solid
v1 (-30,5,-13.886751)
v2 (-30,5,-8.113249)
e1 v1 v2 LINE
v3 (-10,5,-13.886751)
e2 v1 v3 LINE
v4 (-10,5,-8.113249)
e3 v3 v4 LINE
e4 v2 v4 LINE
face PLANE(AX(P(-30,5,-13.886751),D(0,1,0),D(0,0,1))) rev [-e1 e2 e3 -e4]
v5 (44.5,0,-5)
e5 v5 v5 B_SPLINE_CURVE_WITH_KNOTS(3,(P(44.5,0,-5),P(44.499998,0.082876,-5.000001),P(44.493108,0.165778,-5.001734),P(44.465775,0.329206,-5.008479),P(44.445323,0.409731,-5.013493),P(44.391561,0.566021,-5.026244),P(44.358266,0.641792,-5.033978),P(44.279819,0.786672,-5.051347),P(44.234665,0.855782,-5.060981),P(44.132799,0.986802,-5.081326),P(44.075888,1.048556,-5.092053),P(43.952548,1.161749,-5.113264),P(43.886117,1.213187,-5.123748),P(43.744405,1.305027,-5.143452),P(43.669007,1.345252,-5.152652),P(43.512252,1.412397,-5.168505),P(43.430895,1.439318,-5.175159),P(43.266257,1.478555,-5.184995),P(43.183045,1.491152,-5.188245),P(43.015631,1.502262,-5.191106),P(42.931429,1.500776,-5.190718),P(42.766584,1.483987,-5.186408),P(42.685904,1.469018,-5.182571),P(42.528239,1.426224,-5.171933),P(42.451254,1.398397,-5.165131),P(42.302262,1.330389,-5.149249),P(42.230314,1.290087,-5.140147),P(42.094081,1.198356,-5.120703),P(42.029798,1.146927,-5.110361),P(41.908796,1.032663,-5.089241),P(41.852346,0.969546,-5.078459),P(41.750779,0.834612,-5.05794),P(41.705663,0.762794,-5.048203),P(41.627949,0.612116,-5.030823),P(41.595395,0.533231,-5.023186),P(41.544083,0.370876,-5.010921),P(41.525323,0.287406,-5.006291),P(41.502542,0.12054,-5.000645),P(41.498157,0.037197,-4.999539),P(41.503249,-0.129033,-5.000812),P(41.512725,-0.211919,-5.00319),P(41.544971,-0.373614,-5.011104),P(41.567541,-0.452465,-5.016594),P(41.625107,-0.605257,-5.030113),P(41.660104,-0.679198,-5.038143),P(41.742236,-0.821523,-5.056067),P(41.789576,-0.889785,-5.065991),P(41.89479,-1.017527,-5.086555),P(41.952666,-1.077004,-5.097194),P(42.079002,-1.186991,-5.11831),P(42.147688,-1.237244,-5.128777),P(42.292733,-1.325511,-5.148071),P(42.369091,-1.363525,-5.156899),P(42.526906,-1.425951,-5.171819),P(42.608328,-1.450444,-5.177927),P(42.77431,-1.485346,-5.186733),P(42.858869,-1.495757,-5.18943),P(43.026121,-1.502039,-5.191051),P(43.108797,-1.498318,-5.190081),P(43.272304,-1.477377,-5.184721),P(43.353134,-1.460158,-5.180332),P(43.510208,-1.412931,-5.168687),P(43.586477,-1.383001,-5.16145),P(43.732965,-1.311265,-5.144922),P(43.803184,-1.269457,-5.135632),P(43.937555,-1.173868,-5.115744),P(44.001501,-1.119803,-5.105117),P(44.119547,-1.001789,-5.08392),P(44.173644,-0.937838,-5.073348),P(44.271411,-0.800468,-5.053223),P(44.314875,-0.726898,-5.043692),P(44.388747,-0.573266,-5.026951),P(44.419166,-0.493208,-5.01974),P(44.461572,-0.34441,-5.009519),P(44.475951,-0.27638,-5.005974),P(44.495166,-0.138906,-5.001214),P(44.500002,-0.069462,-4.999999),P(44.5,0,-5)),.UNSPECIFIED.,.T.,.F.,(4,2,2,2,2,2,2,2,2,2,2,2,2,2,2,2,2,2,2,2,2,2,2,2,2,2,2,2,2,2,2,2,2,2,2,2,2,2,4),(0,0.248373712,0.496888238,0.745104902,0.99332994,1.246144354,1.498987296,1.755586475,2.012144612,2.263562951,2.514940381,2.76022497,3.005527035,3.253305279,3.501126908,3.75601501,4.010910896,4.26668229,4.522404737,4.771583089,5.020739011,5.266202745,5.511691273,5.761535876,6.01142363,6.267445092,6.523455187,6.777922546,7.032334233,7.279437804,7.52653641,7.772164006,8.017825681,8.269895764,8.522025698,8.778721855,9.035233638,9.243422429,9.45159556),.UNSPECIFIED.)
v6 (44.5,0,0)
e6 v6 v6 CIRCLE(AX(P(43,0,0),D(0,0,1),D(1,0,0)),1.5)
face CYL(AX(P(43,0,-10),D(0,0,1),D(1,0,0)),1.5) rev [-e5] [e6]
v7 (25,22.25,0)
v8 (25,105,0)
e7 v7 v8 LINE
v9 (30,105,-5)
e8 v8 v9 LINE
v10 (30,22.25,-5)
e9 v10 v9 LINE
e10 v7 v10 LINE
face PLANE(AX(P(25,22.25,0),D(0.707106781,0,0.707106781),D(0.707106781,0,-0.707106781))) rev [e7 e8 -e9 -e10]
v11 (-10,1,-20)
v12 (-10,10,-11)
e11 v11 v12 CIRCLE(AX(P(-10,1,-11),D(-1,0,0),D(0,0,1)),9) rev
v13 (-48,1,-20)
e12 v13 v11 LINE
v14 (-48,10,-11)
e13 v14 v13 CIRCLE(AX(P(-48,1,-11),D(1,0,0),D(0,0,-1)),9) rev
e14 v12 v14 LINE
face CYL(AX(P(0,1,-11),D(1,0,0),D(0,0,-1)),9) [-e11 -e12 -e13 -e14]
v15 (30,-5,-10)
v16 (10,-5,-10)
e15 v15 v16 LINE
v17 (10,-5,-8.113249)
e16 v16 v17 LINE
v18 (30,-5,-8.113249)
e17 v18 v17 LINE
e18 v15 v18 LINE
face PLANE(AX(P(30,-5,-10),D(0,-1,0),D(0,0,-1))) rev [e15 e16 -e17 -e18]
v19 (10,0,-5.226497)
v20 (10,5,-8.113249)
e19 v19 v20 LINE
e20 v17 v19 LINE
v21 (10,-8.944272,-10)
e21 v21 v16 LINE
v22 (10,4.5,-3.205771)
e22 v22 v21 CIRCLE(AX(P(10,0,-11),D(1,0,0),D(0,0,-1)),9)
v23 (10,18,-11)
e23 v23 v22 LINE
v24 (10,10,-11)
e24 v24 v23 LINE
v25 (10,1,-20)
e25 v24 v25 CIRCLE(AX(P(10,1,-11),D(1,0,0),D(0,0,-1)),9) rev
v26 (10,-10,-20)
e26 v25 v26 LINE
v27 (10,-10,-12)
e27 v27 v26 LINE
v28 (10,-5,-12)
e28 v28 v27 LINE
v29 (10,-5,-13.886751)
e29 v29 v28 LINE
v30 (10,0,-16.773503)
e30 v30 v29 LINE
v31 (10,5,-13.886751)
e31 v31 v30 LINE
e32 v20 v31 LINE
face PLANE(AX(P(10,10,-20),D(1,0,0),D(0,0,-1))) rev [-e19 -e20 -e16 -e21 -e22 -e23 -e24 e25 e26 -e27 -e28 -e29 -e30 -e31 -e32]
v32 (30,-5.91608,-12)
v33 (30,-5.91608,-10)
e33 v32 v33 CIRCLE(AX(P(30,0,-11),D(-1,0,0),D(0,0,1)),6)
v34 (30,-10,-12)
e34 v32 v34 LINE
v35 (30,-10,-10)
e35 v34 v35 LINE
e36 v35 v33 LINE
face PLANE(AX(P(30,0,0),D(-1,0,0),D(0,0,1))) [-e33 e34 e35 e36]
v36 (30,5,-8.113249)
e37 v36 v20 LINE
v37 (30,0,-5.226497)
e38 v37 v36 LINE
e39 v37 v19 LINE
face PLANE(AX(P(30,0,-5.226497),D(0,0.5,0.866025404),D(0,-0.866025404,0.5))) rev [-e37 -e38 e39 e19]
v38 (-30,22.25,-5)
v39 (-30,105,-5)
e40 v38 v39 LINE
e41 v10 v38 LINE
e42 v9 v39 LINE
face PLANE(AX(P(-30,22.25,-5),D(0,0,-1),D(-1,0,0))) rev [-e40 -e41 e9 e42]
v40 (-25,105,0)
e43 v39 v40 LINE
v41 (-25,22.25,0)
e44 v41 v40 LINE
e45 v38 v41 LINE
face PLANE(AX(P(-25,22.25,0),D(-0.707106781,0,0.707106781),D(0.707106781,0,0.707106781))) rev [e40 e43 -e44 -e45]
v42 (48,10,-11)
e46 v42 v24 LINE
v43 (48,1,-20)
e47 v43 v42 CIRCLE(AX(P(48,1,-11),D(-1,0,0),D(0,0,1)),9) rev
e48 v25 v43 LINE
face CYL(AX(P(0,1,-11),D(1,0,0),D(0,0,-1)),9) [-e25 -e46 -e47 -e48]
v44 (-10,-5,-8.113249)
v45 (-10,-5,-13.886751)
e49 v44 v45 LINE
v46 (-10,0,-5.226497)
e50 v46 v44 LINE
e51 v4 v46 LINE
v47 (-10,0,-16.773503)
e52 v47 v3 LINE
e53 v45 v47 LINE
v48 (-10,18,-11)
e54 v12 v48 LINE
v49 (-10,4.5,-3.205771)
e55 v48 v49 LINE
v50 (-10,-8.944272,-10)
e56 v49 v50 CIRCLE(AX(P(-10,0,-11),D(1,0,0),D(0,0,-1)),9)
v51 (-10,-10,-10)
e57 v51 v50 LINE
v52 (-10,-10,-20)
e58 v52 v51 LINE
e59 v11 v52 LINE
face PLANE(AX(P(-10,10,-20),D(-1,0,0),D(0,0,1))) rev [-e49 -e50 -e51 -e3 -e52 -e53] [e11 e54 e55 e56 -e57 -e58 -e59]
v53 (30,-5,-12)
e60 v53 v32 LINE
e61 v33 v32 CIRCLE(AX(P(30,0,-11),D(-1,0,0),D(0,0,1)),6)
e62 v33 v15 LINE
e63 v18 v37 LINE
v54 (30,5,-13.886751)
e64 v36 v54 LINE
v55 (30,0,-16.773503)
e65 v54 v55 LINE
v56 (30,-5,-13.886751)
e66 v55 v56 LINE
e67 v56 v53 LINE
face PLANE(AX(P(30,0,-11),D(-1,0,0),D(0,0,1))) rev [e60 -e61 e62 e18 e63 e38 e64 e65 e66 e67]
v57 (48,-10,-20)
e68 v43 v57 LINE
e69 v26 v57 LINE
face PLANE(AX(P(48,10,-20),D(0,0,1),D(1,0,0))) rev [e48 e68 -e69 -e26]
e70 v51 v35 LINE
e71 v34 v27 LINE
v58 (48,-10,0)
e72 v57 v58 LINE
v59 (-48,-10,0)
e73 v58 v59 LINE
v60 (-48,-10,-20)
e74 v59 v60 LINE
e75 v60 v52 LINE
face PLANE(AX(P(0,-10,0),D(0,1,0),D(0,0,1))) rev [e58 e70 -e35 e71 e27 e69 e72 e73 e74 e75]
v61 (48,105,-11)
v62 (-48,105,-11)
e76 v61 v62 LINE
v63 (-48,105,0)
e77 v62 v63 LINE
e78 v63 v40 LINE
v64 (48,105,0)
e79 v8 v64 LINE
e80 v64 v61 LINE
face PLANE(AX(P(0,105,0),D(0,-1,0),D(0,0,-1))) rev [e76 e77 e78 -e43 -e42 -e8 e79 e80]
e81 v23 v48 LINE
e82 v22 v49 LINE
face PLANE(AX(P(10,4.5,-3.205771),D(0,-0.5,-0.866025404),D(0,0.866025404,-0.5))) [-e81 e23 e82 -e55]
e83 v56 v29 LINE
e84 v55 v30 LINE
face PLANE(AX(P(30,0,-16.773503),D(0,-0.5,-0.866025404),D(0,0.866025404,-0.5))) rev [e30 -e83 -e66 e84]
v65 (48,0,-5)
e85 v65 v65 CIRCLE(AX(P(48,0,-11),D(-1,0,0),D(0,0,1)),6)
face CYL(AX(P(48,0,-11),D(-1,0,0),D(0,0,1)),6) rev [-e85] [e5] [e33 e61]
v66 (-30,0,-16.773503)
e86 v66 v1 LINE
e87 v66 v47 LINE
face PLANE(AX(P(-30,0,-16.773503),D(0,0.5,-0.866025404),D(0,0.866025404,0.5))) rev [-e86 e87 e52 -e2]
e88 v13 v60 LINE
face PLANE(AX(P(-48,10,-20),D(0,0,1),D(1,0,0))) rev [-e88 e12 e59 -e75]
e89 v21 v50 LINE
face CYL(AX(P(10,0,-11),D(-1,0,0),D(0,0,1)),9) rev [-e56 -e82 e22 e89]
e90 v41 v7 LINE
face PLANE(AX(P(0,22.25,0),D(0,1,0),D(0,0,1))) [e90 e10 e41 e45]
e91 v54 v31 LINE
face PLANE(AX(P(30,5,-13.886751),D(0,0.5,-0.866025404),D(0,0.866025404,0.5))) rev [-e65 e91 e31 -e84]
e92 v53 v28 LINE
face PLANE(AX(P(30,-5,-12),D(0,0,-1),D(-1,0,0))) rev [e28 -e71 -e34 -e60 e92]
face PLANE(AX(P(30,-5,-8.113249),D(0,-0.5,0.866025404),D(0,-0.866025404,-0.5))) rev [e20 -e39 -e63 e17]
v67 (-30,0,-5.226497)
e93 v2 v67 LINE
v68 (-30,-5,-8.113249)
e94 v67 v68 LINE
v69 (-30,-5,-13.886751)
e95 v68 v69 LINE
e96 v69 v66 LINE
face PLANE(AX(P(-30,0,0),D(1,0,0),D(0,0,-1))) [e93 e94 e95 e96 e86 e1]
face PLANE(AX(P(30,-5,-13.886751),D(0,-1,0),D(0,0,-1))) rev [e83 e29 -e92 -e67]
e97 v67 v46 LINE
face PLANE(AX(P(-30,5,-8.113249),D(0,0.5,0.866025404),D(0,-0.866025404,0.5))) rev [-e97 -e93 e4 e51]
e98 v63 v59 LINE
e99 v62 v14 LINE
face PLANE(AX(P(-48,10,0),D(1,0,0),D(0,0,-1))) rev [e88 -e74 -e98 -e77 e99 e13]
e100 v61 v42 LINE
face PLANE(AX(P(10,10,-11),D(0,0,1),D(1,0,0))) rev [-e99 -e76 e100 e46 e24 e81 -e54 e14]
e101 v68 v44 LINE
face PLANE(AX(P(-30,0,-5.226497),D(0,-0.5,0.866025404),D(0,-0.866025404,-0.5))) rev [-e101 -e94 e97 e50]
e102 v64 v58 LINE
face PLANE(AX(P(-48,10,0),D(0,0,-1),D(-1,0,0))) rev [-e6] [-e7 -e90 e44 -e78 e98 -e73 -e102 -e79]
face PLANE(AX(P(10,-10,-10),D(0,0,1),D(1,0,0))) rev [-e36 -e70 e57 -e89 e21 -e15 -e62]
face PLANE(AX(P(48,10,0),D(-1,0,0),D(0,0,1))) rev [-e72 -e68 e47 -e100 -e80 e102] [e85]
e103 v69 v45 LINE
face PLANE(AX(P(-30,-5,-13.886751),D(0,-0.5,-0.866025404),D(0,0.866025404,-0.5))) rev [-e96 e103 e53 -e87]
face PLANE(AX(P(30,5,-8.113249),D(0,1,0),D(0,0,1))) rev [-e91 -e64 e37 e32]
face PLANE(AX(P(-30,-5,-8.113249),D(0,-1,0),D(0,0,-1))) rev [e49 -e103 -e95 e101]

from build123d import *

# Parameters (mm, degrees)
BOSS_EXTRUDE1_DEPTH = 10
BOSS_EXTRUDE3_DEPTH = 10
CUT_EXTRUDE1_DEPTH  = 20
CUT_EXTRUDE2_DEPTH  = 20
SKETCH5_R           = 6
CUT_EXTRUDE3_DEPTH  = 18
SKETCH11_W          = 96
SKETCH11_H          = 11
BOSS_EXTRUDE2_DEPTH = 95
CUT_EXTRUDE10_DEPTH = 20
CUT_EXTRUDE11_DEPTH = 82.75
FILLET3_R           = 9
SKETCH18_R          = 1.5
CUT_EXTRUDE12_DEPTH = 10


with BuildPart() as part:
    # Sketch2 → Boss-Extrude1 (new body)
    with BuildSketch(Plane(origin=(0, 0, 0), x_dir=(1, 0, 0), z_dir=(0, 1, 0))):
        Polygon((-48, 0), (48, 0), (48, 20), (10, 20), (10, 11), (-10, 11), (-10, 20), (-48, 20), align=None)
    extrude(amount=BOSS_EXTRUDE1_DEPTH)

    # Sketch16 → Boss-Extrude3 (add)
    with BuildSketch(Plane.XZ):
        Polygon((-48, 0), (48, 0), (48, -20), (10, -20), (10, -10), (-10, -10), (-10, -20), (-48, -20), align=None)
    extrude(amount=BOSS_EXTRUDE3_DEPTH)

    # Sketch3 → Cut-Extrude1 (cut)
    with BuildSketch(Plane(origin=(-10, 0, 0), x_dir=(0, 0, -1), z_dir=(1, 0, 0))):
        Polygon((16.773502692, 0), (13.886751346, 5), (8.113248654, 5), (5.226497308, 0), (8.113248654, -5), (13.886751346, -5), align=None)
    extrude(amount=-CUT_EXTRUDE1_DEPTH, mode=Mode.SUBTRACT)

    # Sketch4 → Cut-Extrude2 (cut)
    with BuildSketch(Plane.ZY.offset(-10)):
        Polygon((-16.773502692, 0), (-13.886751346, -5), (-12, -5), (-12, -10), (-10, -10), (-10, -5), (-8.113248654, -5), (-5.226497308, 0), (-8.113248654, 5), (-13.886751346, 5), align=None)
    extrude(amount=-CUT_EXTRUDE2_DEPTH, mode=Mode.SUBTRACT)

    # Sketch5 → Cut-Extrude3 (cut)
    with BuildSketch(Plane.ZY.offset(-30)):
        with Locations((-11, 0)):
            Circle(SKETCH5_R)
    extrude(amount=-CUT_EXTRUDE3_DEPTH, mode=Mode.SUBTRACT)

    # Sketch11 → Boss-Extrude2 (add)
    with BuildSketch(Plane(origin=(0, 10, 0), x_dir=(1, 0, 0), z_dir=(0, 1, 0))):
        with Locations((0, 5.5)):
            Rectangle(SKETCH11_W, SKETCH11_H)
    extrude(amount=BOSS_EXTRUDE2_DEPTH)

    # Sketch14 → Cut-Extrude10 (cut)
    with BuildSketch(Plane(origin=(-10, 0, 0), x_dir=(0, 0, -1), z_dir=(1, 0, 0))):
        with BuildLine():
            Line((11, -9), (11, 18))
            Line((11, 18), (3.205771366, 4.5))
            ThreePointArc((3.205771366, 4.5), (3.205771366, -4.5), (11, -9))
        make_face()
    extrude(amount=CUT_EXTRUDE10_DEPTH, mode=Mode.SUBTRACT)

    # Sketch17 → Cut-Extrude11 (cut)
    with BuildSketch(Plane(origin=(0, 105, 0), x_dir=(1, 0, 0), z_dir=(0, 1, 0))):
        Polygon((25, 0), (-25, 0), (-30, 5), (30, 5), align=None)
    extrude(amount=-CUT_EXTRUDE11_DEPTH, mode=Mode.SUBTRACT)

    # Fillet3
    fillet3_edges = [part.edges().sort_by_distance(p)[0] for p in [
        (29, 10, -20),
        (-29, 10, -20),
    ]]
    fillet(fillet3_edges, radius=FILLET3_R - 0.0001)  # a hair under: the kernel refuses the full size

    # Sketch18 → Cut-Extrude12 (cut)
    with BuildSketch(Plane.XY):
        with Locations((43, 0)):
            Circle(SKETCH18_R)
    extrude(amount=-CUT_EXTRUDE12_DEPTH, mode=Mode.SUBTRACT)


solid = part.part
